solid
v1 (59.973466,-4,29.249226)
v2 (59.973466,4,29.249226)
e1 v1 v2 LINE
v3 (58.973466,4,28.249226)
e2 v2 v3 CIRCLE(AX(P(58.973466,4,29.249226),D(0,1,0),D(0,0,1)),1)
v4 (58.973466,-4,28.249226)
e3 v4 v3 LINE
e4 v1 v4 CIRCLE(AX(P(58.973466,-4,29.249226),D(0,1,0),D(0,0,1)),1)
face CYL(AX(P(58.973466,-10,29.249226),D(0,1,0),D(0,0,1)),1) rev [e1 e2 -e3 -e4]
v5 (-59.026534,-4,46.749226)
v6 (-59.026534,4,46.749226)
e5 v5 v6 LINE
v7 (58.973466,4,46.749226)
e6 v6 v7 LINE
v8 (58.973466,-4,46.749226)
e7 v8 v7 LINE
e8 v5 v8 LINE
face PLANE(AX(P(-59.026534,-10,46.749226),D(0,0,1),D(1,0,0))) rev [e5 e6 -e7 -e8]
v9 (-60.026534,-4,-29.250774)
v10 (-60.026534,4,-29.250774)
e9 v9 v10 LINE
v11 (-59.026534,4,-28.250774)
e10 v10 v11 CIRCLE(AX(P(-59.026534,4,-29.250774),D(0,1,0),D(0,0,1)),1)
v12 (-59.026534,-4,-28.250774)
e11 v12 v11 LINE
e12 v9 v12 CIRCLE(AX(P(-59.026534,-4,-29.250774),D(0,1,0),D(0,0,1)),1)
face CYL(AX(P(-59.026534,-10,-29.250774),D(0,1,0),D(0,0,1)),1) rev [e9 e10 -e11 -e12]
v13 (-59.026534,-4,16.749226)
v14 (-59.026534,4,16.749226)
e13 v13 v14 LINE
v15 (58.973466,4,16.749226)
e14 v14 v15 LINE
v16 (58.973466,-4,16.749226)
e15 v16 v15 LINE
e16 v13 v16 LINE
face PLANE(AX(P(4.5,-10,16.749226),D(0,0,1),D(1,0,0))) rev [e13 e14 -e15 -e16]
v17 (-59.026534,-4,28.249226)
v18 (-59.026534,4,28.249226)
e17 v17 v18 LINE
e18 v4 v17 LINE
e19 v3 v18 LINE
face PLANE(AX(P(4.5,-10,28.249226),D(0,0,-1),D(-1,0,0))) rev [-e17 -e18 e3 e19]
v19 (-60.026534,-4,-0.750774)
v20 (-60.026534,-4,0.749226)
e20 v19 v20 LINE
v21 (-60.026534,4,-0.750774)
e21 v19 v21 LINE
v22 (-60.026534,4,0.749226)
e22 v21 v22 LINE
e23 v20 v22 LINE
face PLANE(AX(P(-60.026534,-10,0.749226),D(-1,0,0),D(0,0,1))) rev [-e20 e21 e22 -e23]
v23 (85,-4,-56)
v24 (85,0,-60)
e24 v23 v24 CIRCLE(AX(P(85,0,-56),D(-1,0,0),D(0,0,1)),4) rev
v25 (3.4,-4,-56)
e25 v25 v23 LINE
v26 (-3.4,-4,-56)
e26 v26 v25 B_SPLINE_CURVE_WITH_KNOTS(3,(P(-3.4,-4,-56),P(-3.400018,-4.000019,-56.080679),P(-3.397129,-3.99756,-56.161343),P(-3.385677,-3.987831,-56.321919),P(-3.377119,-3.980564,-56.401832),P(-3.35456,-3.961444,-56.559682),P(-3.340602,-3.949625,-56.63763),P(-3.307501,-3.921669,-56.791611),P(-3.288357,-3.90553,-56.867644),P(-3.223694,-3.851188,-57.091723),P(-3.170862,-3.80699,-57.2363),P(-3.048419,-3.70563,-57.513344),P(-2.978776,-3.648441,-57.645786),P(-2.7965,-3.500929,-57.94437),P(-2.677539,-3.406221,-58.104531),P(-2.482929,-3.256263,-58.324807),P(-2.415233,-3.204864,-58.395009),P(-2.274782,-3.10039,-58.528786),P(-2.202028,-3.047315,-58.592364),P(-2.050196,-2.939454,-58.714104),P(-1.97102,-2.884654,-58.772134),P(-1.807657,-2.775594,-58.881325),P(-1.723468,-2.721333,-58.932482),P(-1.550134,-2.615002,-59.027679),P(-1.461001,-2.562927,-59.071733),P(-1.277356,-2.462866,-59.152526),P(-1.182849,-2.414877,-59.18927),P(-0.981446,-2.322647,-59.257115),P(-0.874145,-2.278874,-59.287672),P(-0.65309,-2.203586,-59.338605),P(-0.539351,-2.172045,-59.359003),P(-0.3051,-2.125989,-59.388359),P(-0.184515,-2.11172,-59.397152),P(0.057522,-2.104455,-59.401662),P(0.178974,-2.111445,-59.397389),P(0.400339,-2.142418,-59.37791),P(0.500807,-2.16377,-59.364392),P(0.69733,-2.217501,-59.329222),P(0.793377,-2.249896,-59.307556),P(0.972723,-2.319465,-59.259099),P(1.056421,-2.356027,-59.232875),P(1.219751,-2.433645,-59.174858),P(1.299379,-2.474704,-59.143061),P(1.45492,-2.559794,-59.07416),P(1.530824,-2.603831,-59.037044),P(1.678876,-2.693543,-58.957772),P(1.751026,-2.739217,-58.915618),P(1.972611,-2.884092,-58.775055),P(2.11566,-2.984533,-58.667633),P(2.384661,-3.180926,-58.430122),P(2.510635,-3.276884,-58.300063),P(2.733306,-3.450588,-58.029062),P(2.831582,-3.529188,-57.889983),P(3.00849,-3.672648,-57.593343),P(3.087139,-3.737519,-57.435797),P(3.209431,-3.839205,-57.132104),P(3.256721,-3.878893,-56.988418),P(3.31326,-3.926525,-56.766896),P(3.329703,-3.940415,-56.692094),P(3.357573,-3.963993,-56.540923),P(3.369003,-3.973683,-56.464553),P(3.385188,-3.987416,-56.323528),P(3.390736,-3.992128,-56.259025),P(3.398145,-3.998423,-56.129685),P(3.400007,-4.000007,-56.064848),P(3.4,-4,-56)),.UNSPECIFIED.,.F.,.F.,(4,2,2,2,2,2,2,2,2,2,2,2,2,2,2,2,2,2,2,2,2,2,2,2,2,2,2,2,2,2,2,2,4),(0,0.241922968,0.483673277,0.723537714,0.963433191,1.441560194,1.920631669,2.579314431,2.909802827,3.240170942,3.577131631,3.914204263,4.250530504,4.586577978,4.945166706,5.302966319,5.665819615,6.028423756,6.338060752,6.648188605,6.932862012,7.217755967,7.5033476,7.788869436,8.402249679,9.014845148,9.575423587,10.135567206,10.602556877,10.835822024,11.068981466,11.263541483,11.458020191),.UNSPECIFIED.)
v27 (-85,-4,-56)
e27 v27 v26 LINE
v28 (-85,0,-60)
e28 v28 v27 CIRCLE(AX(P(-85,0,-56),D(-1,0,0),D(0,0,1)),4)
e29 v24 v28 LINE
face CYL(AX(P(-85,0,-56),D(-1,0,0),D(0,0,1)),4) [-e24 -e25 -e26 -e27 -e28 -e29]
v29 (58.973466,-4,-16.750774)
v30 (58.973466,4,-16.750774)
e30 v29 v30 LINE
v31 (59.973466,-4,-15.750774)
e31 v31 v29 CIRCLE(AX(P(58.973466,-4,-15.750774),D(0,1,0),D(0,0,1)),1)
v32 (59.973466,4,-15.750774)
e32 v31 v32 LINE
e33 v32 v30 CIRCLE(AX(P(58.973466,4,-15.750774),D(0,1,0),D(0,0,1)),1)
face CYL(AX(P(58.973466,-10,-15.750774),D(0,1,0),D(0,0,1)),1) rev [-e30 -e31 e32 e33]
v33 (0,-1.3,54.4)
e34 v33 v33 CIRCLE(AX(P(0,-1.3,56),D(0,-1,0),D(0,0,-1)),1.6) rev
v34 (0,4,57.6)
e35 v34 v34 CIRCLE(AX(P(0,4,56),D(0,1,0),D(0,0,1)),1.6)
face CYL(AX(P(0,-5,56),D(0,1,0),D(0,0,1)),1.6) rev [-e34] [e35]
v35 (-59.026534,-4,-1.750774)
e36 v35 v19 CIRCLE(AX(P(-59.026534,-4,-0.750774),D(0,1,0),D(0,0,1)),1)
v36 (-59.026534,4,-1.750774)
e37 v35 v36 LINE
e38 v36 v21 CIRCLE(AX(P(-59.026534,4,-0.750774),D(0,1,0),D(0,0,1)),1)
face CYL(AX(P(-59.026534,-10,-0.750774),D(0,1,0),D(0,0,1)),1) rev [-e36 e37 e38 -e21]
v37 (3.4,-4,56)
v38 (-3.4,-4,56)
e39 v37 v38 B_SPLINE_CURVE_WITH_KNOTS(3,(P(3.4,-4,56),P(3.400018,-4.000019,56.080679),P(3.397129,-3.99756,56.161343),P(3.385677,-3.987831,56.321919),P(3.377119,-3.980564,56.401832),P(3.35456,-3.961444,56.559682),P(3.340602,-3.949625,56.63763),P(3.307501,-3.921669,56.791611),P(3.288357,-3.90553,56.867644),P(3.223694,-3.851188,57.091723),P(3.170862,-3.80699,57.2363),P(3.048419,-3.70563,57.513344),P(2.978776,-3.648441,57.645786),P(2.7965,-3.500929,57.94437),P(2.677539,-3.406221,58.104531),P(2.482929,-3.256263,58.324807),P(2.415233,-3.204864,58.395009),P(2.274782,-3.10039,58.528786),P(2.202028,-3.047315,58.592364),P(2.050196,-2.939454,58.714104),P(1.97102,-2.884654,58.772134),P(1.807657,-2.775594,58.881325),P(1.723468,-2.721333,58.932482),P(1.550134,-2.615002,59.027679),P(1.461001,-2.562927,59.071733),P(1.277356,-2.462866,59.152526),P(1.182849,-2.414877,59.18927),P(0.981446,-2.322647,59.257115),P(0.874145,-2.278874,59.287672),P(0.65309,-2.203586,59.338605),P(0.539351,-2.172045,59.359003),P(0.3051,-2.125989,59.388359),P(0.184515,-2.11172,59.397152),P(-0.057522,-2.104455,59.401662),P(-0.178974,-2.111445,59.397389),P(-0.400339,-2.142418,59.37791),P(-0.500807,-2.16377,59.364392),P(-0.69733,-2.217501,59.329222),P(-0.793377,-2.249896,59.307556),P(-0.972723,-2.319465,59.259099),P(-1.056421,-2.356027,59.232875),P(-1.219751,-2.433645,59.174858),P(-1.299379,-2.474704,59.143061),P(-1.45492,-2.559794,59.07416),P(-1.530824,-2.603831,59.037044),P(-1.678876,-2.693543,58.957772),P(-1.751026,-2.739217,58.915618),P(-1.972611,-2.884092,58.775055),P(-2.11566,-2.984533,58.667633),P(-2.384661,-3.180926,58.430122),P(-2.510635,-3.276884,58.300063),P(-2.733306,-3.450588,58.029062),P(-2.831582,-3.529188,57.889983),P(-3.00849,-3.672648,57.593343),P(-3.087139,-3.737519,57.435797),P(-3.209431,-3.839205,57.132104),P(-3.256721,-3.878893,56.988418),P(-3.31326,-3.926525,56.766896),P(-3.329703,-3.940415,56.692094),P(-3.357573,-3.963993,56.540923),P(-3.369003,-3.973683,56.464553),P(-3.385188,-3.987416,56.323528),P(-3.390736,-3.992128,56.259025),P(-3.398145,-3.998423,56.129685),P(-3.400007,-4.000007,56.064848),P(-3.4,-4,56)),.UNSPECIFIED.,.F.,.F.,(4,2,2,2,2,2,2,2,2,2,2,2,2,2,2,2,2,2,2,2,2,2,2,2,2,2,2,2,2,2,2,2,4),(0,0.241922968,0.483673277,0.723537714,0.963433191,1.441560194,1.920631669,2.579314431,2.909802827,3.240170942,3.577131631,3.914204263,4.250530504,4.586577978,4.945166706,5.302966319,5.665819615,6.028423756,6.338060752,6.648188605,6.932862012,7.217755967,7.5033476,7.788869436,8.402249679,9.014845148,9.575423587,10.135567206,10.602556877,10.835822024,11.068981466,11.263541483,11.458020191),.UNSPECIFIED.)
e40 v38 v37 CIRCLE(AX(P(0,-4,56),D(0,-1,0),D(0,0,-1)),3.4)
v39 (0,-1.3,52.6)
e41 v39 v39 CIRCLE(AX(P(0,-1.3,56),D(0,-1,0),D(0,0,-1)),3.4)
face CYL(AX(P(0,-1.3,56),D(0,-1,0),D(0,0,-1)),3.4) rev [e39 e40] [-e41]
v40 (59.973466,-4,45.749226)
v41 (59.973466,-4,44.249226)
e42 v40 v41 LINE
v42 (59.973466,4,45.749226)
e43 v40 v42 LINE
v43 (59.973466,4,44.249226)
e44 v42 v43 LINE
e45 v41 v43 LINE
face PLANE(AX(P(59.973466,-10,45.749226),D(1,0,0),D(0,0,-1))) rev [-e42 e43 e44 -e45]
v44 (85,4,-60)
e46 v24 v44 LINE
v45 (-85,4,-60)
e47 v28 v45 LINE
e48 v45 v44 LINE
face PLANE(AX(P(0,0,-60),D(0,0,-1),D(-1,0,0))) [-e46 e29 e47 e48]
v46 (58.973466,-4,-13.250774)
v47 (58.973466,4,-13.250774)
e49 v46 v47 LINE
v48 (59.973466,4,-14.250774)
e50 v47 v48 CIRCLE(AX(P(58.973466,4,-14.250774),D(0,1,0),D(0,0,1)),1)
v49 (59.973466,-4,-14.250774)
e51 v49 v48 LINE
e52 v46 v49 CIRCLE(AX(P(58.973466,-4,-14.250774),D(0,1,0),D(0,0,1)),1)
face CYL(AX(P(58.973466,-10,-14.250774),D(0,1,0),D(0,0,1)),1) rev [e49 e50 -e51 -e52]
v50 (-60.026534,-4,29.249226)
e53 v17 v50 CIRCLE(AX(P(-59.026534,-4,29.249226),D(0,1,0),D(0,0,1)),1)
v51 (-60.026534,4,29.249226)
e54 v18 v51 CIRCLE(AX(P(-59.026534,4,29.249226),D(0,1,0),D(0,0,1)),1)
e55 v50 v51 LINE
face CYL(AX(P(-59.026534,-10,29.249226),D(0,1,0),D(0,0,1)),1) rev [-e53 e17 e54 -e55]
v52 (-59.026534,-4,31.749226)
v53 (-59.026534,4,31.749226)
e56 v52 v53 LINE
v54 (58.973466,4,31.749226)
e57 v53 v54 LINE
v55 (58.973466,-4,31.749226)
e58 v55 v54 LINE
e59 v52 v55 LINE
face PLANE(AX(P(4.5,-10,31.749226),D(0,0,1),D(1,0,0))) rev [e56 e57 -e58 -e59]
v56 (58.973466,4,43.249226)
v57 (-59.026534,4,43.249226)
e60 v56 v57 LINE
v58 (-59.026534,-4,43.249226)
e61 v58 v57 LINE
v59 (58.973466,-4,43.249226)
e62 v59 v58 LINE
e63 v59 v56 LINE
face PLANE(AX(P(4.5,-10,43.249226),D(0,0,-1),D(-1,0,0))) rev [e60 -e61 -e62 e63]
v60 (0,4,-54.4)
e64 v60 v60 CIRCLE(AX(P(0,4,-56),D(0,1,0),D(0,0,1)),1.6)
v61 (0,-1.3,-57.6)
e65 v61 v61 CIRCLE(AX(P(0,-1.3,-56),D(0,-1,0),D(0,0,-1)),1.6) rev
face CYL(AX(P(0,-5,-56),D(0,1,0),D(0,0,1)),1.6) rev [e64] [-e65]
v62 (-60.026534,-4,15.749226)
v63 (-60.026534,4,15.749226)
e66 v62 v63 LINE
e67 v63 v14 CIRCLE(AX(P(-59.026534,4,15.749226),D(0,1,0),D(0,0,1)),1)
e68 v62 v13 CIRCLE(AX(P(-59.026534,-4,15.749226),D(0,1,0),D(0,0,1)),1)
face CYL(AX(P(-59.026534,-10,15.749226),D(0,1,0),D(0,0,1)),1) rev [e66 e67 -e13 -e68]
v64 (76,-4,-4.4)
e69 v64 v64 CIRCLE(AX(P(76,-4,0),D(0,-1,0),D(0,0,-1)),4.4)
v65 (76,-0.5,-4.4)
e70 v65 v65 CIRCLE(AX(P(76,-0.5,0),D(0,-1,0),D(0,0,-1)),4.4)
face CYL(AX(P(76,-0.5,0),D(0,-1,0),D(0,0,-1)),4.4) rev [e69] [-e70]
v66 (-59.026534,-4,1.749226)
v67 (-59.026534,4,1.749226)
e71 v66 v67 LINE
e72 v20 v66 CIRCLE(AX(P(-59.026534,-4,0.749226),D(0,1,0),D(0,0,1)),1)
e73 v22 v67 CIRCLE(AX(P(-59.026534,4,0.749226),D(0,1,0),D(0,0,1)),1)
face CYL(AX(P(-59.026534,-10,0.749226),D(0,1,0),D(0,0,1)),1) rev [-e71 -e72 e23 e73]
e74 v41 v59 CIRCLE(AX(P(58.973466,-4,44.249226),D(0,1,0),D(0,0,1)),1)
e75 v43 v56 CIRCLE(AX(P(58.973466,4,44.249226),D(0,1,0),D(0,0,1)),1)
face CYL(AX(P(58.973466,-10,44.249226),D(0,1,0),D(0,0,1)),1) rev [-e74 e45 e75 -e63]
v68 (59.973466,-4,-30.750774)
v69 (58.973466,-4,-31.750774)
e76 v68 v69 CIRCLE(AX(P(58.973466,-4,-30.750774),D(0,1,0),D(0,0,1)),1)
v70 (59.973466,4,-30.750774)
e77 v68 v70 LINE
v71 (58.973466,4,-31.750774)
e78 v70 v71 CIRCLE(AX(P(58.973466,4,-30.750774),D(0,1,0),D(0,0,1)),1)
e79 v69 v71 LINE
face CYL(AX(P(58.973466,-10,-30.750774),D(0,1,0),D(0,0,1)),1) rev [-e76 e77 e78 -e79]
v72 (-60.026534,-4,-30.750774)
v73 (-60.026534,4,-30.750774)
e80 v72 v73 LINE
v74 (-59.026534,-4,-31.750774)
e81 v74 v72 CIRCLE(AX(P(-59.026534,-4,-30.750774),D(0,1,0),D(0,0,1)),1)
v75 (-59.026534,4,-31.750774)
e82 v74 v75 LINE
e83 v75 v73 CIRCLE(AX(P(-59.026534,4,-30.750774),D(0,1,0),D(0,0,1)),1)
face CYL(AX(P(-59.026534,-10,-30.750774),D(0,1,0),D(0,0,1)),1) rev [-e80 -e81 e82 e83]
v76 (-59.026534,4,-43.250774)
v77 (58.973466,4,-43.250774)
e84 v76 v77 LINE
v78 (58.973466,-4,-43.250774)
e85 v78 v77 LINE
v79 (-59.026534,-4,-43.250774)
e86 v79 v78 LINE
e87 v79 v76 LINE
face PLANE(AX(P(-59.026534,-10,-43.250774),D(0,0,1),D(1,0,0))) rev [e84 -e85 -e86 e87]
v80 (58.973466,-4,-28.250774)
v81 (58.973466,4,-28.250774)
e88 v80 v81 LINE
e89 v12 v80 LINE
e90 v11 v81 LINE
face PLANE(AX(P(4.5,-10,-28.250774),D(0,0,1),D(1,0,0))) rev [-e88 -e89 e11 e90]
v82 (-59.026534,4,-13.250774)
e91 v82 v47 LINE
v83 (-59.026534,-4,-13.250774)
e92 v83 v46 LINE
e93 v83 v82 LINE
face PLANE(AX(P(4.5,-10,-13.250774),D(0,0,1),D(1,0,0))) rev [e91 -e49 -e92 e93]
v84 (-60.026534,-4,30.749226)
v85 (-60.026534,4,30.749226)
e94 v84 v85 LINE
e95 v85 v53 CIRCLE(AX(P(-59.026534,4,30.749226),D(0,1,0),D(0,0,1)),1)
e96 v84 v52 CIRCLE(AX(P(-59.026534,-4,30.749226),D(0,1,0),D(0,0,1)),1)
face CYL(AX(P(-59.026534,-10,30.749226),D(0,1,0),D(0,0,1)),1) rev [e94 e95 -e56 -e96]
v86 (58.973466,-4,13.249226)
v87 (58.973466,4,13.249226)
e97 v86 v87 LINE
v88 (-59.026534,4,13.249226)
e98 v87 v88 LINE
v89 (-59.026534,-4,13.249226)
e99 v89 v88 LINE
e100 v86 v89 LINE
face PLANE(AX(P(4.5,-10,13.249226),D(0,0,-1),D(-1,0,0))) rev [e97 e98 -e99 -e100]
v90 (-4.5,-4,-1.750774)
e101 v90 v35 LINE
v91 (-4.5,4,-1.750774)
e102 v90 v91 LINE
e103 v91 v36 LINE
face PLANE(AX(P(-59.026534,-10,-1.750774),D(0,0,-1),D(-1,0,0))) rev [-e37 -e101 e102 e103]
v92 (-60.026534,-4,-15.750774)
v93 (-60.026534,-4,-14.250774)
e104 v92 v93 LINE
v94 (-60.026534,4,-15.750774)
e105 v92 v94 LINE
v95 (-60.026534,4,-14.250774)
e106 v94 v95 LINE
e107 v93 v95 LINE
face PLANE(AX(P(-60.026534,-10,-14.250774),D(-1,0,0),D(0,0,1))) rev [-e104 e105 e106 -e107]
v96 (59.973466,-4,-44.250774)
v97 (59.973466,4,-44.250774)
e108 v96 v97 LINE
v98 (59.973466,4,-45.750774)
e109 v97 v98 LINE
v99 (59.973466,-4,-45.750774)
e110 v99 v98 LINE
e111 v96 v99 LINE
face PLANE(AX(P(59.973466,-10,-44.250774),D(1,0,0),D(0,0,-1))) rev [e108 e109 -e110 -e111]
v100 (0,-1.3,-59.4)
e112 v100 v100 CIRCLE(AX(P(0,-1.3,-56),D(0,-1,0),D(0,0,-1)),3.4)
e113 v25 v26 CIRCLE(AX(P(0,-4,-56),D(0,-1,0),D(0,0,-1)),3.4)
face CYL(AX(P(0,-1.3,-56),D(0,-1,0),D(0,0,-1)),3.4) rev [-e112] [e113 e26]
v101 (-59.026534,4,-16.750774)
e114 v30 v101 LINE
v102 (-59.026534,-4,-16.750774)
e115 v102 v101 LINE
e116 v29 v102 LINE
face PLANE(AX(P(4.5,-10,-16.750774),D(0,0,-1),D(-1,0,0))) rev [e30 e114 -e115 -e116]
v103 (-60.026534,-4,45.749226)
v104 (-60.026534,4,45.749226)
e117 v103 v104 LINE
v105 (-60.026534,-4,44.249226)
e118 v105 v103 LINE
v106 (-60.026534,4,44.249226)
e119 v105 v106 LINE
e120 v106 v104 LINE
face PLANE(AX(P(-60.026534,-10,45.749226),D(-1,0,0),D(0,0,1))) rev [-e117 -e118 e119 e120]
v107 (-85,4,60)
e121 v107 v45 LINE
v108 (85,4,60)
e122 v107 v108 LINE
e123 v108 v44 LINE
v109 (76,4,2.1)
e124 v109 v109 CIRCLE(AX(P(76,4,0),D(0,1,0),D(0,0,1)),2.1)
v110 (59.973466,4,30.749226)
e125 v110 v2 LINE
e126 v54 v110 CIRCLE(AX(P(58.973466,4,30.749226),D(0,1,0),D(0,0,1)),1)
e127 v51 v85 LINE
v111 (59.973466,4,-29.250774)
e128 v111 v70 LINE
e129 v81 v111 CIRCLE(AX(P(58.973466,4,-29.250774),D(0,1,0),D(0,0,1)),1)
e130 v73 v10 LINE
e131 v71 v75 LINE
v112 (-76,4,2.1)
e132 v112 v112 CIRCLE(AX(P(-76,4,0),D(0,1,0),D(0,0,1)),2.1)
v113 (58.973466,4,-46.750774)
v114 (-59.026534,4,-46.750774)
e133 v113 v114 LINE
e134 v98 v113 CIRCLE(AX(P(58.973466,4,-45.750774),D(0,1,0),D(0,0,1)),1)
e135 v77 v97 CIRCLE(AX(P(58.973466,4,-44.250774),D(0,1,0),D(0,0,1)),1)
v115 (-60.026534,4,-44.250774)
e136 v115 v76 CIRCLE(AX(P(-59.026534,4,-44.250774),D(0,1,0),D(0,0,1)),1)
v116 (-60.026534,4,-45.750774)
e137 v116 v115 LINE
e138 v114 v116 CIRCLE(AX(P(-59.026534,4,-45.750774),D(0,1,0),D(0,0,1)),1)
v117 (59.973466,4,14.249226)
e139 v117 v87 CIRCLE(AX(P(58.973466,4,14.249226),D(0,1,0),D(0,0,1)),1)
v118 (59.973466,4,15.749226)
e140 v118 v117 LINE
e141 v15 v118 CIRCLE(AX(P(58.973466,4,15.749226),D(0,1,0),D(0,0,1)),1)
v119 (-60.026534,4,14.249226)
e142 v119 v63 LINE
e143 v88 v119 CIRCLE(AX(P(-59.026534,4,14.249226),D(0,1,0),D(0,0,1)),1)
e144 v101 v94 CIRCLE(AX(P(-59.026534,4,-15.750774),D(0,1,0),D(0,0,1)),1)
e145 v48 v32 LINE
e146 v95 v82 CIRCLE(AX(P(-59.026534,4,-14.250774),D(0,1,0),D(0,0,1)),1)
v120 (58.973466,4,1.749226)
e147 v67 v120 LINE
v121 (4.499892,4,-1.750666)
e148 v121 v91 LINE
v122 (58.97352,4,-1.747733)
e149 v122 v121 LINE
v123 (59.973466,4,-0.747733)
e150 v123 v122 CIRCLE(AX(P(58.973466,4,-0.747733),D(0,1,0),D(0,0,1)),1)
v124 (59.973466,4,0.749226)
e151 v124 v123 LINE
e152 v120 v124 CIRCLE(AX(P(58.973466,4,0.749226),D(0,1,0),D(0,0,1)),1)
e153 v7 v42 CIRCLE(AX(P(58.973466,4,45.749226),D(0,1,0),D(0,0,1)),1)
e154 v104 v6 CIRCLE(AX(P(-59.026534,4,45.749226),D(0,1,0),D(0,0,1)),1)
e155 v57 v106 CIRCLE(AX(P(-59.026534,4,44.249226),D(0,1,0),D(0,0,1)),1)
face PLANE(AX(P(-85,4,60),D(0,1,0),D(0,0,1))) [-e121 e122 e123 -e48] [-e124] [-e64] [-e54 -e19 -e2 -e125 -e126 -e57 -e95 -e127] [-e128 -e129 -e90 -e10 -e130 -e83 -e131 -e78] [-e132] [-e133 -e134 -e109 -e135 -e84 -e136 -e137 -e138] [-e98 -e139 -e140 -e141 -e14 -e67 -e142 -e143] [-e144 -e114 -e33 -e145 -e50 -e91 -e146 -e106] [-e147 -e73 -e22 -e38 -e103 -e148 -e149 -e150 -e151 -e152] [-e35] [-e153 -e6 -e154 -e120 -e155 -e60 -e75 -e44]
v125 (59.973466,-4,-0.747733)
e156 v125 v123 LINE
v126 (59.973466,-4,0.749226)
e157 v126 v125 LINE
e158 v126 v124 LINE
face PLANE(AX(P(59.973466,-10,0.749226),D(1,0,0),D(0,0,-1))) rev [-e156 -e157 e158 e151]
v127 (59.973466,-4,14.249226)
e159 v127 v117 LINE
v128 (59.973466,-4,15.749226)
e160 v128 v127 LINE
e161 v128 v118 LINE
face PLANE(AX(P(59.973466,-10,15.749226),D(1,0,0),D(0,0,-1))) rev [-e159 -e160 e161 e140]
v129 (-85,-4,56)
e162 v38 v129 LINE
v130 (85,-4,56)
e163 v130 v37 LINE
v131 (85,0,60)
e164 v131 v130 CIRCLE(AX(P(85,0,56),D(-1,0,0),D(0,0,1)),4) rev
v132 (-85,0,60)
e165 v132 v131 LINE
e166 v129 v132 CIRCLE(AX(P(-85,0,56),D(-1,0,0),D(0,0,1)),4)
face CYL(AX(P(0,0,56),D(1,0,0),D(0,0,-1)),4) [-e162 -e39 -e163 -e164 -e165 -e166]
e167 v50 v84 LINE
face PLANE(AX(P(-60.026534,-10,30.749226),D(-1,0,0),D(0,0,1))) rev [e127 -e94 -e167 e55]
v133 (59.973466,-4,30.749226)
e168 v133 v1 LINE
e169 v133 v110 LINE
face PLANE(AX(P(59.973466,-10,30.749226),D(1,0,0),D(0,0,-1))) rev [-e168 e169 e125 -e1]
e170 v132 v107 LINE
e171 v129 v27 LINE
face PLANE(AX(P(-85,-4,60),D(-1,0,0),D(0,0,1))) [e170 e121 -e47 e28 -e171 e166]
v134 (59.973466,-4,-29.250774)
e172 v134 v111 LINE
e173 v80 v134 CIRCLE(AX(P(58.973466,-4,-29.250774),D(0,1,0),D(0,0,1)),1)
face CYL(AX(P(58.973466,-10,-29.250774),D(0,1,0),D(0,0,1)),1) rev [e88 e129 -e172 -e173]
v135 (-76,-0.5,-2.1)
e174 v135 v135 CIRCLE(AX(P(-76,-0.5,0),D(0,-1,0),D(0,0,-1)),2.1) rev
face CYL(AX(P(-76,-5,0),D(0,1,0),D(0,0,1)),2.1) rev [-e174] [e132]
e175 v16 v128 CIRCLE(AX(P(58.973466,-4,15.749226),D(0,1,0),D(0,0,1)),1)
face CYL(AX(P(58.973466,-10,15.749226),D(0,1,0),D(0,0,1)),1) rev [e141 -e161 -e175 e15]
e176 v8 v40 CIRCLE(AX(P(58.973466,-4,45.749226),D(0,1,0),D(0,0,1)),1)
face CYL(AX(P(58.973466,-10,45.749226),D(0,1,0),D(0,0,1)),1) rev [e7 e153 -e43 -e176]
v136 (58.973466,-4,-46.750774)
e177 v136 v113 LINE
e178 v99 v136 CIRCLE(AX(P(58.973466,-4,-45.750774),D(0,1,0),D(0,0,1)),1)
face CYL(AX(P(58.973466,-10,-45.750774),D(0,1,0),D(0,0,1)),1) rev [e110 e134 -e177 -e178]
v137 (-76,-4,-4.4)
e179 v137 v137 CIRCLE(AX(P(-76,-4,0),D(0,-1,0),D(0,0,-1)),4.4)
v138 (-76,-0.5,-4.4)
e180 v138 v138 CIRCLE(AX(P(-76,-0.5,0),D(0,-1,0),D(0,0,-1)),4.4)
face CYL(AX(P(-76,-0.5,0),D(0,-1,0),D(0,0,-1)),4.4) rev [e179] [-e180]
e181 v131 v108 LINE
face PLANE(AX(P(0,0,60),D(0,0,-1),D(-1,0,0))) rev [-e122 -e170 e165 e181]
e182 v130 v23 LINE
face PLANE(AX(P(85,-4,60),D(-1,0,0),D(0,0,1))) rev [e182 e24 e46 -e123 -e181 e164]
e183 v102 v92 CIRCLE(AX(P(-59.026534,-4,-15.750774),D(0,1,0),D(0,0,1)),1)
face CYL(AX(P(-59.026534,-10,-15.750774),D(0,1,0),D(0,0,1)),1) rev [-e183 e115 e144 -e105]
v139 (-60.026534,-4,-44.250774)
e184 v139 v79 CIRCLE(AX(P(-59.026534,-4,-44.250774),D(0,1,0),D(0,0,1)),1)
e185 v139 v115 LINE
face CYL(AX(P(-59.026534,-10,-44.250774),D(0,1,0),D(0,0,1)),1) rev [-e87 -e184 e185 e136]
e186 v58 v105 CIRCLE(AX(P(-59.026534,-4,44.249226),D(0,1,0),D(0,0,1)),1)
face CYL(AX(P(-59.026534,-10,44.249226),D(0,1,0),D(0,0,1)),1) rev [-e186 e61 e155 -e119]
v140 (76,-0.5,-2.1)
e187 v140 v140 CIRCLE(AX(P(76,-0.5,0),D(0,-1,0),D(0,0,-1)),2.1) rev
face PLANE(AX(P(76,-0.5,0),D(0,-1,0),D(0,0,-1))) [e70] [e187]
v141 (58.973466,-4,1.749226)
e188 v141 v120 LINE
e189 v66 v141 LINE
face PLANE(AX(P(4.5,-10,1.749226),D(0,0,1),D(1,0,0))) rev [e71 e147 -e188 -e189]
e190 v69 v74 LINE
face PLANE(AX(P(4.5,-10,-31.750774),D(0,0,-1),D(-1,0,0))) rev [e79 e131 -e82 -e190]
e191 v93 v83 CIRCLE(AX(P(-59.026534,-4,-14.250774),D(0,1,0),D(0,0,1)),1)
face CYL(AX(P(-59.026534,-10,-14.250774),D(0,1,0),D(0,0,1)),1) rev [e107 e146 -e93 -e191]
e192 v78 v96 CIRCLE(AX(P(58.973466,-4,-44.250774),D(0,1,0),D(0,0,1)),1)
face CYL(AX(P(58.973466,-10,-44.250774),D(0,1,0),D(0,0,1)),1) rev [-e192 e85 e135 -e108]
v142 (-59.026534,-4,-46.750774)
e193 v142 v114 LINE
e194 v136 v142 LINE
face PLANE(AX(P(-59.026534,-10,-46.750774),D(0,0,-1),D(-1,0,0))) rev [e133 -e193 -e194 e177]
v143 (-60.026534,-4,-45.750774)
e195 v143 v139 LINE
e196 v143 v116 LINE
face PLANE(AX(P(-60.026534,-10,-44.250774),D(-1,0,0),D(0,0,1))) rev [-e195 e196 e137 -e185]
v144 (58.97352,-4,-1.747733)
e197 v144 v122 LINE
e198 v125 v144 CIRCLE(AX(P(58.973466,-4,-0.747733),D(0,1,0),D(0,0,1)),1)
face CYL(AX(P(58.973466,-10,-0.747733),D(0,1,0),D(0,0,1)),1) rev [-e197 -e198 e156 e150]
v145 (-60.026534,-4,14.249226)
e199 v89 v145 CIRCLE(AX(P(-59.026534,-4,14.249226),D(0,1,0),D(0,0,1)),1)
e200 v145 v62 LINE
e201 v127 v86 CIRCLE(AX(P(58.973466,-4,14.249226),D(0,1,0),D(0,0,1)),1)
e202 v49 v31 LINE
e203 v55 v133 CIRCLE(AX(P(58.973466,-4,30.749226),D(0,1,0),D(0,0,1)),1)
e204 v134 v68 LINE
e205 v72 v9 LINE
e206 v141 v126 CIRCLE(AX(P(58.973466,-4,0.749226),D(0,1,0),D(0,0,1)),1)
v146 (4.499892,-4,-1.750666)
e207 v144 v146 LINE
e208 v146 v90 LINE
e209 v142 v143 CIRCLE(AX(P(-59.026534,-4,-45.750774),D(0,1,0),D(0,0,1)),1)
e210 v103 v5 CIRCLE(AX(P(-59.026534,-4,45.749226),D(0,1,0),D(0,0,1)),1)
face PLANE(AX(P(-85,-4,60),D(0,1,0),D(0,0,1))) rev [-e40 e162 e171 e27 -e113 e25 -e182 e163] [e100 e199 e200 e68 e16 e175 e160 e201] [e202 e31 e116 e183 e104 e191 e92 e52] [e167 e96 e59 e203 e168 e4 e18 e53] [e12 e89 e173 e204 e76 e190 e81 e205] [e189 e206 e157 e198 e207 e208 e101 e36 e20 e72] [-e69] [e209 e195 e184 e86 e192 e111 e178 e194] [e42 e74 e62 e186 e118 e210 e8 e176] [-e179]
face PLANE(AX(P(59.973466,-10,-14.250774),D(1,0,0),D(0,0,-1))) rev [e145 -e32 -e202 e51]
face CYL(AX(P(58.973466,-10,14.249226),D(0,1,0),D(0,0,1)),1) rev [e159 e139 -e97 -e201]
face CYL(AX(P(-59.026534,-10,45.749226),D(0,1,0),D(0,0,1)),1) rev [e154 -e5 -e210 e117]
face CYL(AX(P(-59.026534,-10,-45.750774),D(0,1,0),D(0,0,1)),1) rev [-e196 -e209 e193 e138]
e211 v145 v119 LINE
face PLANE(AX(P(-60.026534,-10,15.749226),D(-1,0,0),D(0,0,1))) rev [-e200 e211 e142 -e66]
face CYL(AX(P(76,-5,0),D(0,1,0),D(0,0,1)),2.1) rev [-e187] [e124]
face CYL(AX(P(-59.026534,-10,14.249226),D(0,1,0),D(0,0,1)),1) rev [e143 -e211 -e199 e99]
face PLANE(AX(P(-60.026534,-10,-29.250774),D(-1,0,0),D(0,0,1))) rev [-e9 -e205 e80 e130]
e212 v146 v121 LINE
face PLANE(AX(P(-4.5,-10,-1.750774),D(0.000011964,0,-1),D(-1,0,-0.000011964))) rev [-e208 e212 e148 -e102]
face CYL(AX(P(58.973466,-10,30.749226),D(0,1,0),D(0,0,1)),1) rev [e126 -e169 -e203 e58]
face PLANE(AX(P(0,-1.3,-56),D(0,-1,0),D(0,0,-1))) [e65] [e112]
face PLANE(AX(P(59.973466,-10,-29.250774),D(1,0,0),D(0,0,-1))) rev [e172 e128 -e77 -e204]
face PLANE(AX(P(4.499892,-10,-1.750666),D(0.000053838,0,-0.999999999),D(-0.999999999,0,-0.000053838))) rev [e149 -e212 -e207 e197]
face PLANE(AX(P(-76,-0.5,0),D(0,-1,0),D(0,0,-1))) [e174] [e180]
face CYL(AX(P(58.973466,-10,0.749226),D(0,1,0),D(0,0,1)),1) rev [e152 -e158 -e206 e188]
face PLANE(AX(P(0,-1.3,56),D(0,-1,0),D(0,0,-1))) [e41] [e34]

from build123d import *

# Parameters (mm, degrees)
IZIM1_W                     = 170
IZIM1_H                     = 8
Y_KSEKLIK_EKSTR_ZYON1_DEPTH = 60
IZIM2_R                     = 1.6
IZIM2_R_2                   = 2.1
KES_EKSTR_ZYON1_DEPTH       = 5
IZIM3_R                     = 3.4
KES_EKSTR_ZYON2_DEPTH       = 2.7
IZIM4_R                     = 4.4
KES_EKSTR_ZYON3_DEPTH       = 3.5
RADYUS1_R                   = 4
KES_EKSTR_ZYON4_DEPTH       = 10


with BuildPart() as part:
    # Çizim1 → Yükseklik-Ekstrüzyon1 (new, symmetric)
    with BuildSketch(Plane.XY):
        Rectangle(IZIM1_W, IZIM1_H)
    extrude(amount=Y_KSEKLIK_EKSTR_ZYON1_DEPTH, both=True)

    # Çizim2 → Kes-Ekstrüzyon1 (cut, symmetric)
    with BuildSketch(Plane(origin=(0, 0, 0), x_dir=(1, 0, 0), z_dir=(0, 1, 0))):
        with Locations(Location((0, 56, 0), (0, 0, 270))):
            Circle(IZIM2_R)
        with Locations(Location((0, -56, 0), (0, 0, 270))):
            Circle(IZIM2_R)
        with Locations(Location((-76, 0, 0), (0, 0, 270))):
            Circle(IZIM2_R_2)
        with Locations(Location((76, 0, 0), (0, 0, 270))):
            Circle(IZIM2_R_2)
    extrude(amount=KES_EKSTR_ZYON1_DEPTH, both=True, mode=Mode.SUBTRACT)

    # Çizim3 → Kes-Ekstrüzyon2 (cut)
    with BuildSketch(Plane.XZ.offset(4)):
        with Locations(Location((0, -56, 0), (0, 0, 270))):
            Circle(IZIM3_R)
        with Locations(Location((0, 56, 0), (0, 0, 270))):
            Circle(IZIM3_R)
    extrude(amount=-KES_EKSTR_ZYON2_DEPTH, mode=Mode.SUBTRACT)

    # Çizim4 → Kes-Ekstrüzyon3 (cut)
    with BuildSketch(Plane.XZ.offset(4)):
        with Locations(Location((-76, 0, 0), (0, 0, 270))):
            Circle(IZIM4_R)
        with Locations(Location((76, 0, 0), (0, 0, 270))):
            Circle(IZIM4_R)
    extrude(amount=-KES_EKSTR_ZYON3_DEPTH, mode=Mode.SUBTRACT)

    # Radyus1
    # the kernel refuses this fillet: 4 mm, written as the material it takes off along each edge
    with BuildSketch(Plane(origin=(-95, -4, 60), x_dir=(0, 0, -1), z_dir=(1, 0, 0))) as radyus1_piece_1:
        with BuildLine():
            CenterArc((RADYUS1_R, RADYUS1_R), RADYUS1_R, 180, 90)
            Line((0, RADYUS1_R), (0, 0))
            Line((0, 0), (RADYUS1_R, 0))
        make_face()
    extrude(amount=190, mode=Mode.SUBTRACT)
    with BuildSketch(Plane(origin=(-95, -4, -60), x_dir=(0, 0, 1), z_dir=(1, 0, 0))) as radyus1_piece_2:
        with BuildLine():
            CenterArc((RADYUS1_R, -RADYUS1_R), RADYUS1_R, 90, 90)
            Line((0, -RADYUS1_R), (0, 0))
            Line((0, 0), (RADYUS1_R, 0))
        make_face()
    extrude(amount=190, mode=Mode.SUBTRACT)

    # Çizim6 → Kes-Ekstrüzyon4 (cut, symmetric)
    with BuildSketch(Plane(origin=(0, 0, 0), x_dir=(1, 0, 0), z_dir=(0, 1, 0))):
        with BuildLine():
            Line((4.5, -43.24922609), (58.973465944, -43.24922609))
            ThreePointArc((58.973465944, -43.24922609), (59.680572726, -43.542119309), (59.973465944, -44.24922609))
            Line((59.973465944, -44.24922609), (59.973465944, -45.74922609))
            ThreePointArc((59.973465944, -45.74922609), (59.680572726, -46.456332871), (58.973465944, -46.74922609))
            Line((58.973465944, -46.74922609), (-59.026534056, -46.74922609))
            ThreePointArc((-59.026534056, -46.74922609), (-59.733640837, -46.456332871), (-60.026534056, -45.74922609))
            Line((-60.026534056, -45.74922609), (-60.026534056, -44.24922609))
            ThreePointArc((-60.026534056, -44.24922609), (-59.733640837, -43.542119309), (-59.026534056, -43.24922609))
            Line((-59.026534056, -43.24922609), (-4.5, -43.24922609))
            Line((-4.5, -43.24922609), (4.5, -43.24922609))
        make_face()
        with BuildLine():
            Line((-59.026534056, -1.74922609), (-4.5, -1.74922609))
            Line((-4.5, -1.74922609), (4.5, -1.74922609))
            Line((4.5, -1.74922609), (58.973465944, -1.74922609))
            ThreePointArc((58.973465944, -1.74922609), (59.680572726, -1.456332871), (59.973465944, -0.74922609))
            Line((59.973465944, -0.74922609), (59.973465944, 0.747733475))
            ThreePointArc((59.973465944, 0.747733475), (59.68059176, 1.454821222), (58.973519783, 1.747733474))
            Line((58.973519783, 1.747733474), (4.499892323, 1.750666239))
            Line((4.499892323, 1.750666239), (-4.5, 1.75077391))
            Line((-4.5, 1.75077391), (-59.026534056, 1.75077391))
            ThreePointArc((-59.026534056, 1.75077391), (-59.733640837, 1.457880691), (-60.026534056, 0.75077391))
            Line((-60.026534056, 0.75077391), (-60.026534056, -0.74922609))
            ThreePointArc((-60.026534056, -0.74922609), (-59.733640837, -1.456332871), (-59.026534056, -1.74922609))
        make_face()
        with BuildLine():
            Line((4.5, -28.24922609), (58.973465944, -28.24922609))
            ThreePointArc((58.973465944, -28.24922609), (59.680572726, -28.542119309), (59.973465944, -29.24922609))
            Line((59.973465944, -29.24922609), (59.973465944, -30.74922609))
            ThreePointArc((59.973465944, -30.74922609), (59.680572726, -31.456332871), (58.973465944, -31.74922609))
            Line((58.973465944, -31.74922609), (4.5, -31.74922609))
            Line((4.5, -31.74922609), (-4.5, -31.74922609))
            Line((-4.5, -31.74922609), (-59.026534056, -31.74922609))
            ThreePointArc((-59.026534056, -31.74922609), (-59.733640837, -31.456332871), (-60.026534056, -30.74922609))
            Line((-60.026534056, -30.74922609), (-60.026534056, -29.24922609))
            ThreePointArc((-60.026534056, -29.24922609), (-59.733640837, -28.542119309), (-59.026534056, -28.24922609))
            Line((-59.026534056, -28.24922609), (-4.5, -28.24922609))
            Line((-4.5, -28.24922609), (4.5, -28.24922609))
        make_face()
        with BuildLine():
            Line((-60.026534056, 14.25077391), (-60.026534056, 15.75077391))
            ThreePointArc((-60.026534056, 15.75077391), (-59.733640837, 16.457880691), (-59.026534056, 16.75077391))
            Line((-59.026534056, 16.75077391), (-4.5, 16.75077391))
            Line((-4.5, 16.75077391), (4.5, 16.75077391))
            Line((4.5, 16.75077391), (58.973465944, 16.75077391))
            ThreePointArc((58.973465944, 16.75077391), (59.680572726, 16.457880691), (59.973465944, 15.75077391))
            Line((59.973465944, 15.75077391), (59.973465944, 14.25077391))
            ThreePointArc((59.973465944, 14.25077391), (59.680572726, 13.543667129), (58.973465944, 13.25077391))
            Line((58.973465944, 13.25077391), (4.5, 13.25077391))
            Line((4.5, 13.25077391), (-4.5, 13.25077391))
            Line((-4.5, 13.25077391), (-59.026534056, 13.25077391))
            ThreePointArc((-59.026534056, 13.25077391), (-59.733640837, 13.543667129), (-60.026534056, 14.25077391))
        make_face()
        with BuildLine():
            Line((-60.026534056, 29.25077391), (-60.026534056, 30.75077391))
            ThreePointArc((-60.026534056, 30.75077391), (-59.733640837, 31.457880691), (-59.026534056, 31.75077391))
            Line((-59.026534056, 31.75077391), (-4.5, 31.75077391))
            Line((-4.5, 31.75077391), (4.5, 31.75077391))
            Line((4.5, 31.75077391), (58.973465944, 31.75077391))
            ThreePointArc((58.973465944, 31.75077391), (59.680572726, 31.457880691), (59.973465944, 30.75077391))
            Line((59.973465944, 30.75077391), (59.973465944, 29.25077391))
            ThreePointArc((59.973465944, 29.25077391), (59.680572726, 28.543667129), (58.973465944, 28.25077391))
            Line((58.973465944, 28.25077391), (4.5, 28.25077391))
            Line((4.5, 28.25077391), (-4.5, 28.25077391))
            Line((-4.5, 28.25077391), (-59.026534056, 28.25077391))
            ThreePointArc((-59.026534056, 28.25077391), (-59.733640837, 28.543667129), (-60.026534056, 29.25077391))
        make_face()
        with BuildLine():
            Line((-60.026534056, 44.25077391), (-60.026534056, 45.75077391))
            ThreePointArc((-60.026534056, 45.75077391), (-59.733640837, 46.457880691), (-59.026534056, 46.75077391))
            Line((-59.026534056, 46.75077391), (58.973465944, 46.75077391))
            ThreePointArc((58.973465944, 46.75077391), (59.680572726, 46.457880691), (59.973465944, 45.75077391))
            Line((59.973465944, 45.75077391), (59.973465944, 44.25077391))
            ThreePointArc((59.973465944, 44.25077391), (59.680572726, 43.543667129), (58.973465944, 43.25077391))
            Line((58.973465944, 43.25077391), (4.5, 43.25077391))
            Line((4.5, 43.25077391), (-4.5, 43.25077391))
            Line((-4.5, 43.25077391), (-59.026534056, 43.25077391))
            ThreePointArc((-59.026534056, 43.25077391), (-59.733640837, 43.543667129), (-60.026534056, 44.25077391))
        make_face()
        with BuildLine():
            Line((-60.026534056, -15.74922609), (-60.026534056, -14.24922609))
            ThreePointArc((-60.026534056, -14.24922609), (-59.733640837, -13.542119309), (-59.026534056, -13.24922609))
            Line((-59.026534056, -13.24922609), (-4.5, -13.24922609))
            Line((-4.5, -13.24922609), (4.5, -13.24922609))
            Line((4.5, -13.24922609), (58.973465944, -13.24922609))
            ThreePointArc((58.973465944, -13.24922609), (59.680572726, -13.542119309), (59.973465944, -14.24922609))
            Line((59.973465944, -14.24922609), (59.973465944, -15.74922609))
            ThreePointArc((59.973465944, -15.74922609), (59.680572726, -16.456332871), (58.973465944, -16.74922609))
            Line((58.973465944, -16.74922609), (4.5, -16.74922609))
            Line((4.5, -16.74922609), (-4.5, -16.74922609))
            Line((-4.5, -16.74922609), (-59.026534056, -16.74922609))
            ThreePointArc((-59.026534056, -16.74922609), (-59.733640837, -16.456332871), (-60.026534056, -15.74922609))
        make_face()
    extrude(amount=KES_EKSTR_ZYON4_DEPTH, both=True, mode=Mode.SUBTRACT)


solid = part.part
